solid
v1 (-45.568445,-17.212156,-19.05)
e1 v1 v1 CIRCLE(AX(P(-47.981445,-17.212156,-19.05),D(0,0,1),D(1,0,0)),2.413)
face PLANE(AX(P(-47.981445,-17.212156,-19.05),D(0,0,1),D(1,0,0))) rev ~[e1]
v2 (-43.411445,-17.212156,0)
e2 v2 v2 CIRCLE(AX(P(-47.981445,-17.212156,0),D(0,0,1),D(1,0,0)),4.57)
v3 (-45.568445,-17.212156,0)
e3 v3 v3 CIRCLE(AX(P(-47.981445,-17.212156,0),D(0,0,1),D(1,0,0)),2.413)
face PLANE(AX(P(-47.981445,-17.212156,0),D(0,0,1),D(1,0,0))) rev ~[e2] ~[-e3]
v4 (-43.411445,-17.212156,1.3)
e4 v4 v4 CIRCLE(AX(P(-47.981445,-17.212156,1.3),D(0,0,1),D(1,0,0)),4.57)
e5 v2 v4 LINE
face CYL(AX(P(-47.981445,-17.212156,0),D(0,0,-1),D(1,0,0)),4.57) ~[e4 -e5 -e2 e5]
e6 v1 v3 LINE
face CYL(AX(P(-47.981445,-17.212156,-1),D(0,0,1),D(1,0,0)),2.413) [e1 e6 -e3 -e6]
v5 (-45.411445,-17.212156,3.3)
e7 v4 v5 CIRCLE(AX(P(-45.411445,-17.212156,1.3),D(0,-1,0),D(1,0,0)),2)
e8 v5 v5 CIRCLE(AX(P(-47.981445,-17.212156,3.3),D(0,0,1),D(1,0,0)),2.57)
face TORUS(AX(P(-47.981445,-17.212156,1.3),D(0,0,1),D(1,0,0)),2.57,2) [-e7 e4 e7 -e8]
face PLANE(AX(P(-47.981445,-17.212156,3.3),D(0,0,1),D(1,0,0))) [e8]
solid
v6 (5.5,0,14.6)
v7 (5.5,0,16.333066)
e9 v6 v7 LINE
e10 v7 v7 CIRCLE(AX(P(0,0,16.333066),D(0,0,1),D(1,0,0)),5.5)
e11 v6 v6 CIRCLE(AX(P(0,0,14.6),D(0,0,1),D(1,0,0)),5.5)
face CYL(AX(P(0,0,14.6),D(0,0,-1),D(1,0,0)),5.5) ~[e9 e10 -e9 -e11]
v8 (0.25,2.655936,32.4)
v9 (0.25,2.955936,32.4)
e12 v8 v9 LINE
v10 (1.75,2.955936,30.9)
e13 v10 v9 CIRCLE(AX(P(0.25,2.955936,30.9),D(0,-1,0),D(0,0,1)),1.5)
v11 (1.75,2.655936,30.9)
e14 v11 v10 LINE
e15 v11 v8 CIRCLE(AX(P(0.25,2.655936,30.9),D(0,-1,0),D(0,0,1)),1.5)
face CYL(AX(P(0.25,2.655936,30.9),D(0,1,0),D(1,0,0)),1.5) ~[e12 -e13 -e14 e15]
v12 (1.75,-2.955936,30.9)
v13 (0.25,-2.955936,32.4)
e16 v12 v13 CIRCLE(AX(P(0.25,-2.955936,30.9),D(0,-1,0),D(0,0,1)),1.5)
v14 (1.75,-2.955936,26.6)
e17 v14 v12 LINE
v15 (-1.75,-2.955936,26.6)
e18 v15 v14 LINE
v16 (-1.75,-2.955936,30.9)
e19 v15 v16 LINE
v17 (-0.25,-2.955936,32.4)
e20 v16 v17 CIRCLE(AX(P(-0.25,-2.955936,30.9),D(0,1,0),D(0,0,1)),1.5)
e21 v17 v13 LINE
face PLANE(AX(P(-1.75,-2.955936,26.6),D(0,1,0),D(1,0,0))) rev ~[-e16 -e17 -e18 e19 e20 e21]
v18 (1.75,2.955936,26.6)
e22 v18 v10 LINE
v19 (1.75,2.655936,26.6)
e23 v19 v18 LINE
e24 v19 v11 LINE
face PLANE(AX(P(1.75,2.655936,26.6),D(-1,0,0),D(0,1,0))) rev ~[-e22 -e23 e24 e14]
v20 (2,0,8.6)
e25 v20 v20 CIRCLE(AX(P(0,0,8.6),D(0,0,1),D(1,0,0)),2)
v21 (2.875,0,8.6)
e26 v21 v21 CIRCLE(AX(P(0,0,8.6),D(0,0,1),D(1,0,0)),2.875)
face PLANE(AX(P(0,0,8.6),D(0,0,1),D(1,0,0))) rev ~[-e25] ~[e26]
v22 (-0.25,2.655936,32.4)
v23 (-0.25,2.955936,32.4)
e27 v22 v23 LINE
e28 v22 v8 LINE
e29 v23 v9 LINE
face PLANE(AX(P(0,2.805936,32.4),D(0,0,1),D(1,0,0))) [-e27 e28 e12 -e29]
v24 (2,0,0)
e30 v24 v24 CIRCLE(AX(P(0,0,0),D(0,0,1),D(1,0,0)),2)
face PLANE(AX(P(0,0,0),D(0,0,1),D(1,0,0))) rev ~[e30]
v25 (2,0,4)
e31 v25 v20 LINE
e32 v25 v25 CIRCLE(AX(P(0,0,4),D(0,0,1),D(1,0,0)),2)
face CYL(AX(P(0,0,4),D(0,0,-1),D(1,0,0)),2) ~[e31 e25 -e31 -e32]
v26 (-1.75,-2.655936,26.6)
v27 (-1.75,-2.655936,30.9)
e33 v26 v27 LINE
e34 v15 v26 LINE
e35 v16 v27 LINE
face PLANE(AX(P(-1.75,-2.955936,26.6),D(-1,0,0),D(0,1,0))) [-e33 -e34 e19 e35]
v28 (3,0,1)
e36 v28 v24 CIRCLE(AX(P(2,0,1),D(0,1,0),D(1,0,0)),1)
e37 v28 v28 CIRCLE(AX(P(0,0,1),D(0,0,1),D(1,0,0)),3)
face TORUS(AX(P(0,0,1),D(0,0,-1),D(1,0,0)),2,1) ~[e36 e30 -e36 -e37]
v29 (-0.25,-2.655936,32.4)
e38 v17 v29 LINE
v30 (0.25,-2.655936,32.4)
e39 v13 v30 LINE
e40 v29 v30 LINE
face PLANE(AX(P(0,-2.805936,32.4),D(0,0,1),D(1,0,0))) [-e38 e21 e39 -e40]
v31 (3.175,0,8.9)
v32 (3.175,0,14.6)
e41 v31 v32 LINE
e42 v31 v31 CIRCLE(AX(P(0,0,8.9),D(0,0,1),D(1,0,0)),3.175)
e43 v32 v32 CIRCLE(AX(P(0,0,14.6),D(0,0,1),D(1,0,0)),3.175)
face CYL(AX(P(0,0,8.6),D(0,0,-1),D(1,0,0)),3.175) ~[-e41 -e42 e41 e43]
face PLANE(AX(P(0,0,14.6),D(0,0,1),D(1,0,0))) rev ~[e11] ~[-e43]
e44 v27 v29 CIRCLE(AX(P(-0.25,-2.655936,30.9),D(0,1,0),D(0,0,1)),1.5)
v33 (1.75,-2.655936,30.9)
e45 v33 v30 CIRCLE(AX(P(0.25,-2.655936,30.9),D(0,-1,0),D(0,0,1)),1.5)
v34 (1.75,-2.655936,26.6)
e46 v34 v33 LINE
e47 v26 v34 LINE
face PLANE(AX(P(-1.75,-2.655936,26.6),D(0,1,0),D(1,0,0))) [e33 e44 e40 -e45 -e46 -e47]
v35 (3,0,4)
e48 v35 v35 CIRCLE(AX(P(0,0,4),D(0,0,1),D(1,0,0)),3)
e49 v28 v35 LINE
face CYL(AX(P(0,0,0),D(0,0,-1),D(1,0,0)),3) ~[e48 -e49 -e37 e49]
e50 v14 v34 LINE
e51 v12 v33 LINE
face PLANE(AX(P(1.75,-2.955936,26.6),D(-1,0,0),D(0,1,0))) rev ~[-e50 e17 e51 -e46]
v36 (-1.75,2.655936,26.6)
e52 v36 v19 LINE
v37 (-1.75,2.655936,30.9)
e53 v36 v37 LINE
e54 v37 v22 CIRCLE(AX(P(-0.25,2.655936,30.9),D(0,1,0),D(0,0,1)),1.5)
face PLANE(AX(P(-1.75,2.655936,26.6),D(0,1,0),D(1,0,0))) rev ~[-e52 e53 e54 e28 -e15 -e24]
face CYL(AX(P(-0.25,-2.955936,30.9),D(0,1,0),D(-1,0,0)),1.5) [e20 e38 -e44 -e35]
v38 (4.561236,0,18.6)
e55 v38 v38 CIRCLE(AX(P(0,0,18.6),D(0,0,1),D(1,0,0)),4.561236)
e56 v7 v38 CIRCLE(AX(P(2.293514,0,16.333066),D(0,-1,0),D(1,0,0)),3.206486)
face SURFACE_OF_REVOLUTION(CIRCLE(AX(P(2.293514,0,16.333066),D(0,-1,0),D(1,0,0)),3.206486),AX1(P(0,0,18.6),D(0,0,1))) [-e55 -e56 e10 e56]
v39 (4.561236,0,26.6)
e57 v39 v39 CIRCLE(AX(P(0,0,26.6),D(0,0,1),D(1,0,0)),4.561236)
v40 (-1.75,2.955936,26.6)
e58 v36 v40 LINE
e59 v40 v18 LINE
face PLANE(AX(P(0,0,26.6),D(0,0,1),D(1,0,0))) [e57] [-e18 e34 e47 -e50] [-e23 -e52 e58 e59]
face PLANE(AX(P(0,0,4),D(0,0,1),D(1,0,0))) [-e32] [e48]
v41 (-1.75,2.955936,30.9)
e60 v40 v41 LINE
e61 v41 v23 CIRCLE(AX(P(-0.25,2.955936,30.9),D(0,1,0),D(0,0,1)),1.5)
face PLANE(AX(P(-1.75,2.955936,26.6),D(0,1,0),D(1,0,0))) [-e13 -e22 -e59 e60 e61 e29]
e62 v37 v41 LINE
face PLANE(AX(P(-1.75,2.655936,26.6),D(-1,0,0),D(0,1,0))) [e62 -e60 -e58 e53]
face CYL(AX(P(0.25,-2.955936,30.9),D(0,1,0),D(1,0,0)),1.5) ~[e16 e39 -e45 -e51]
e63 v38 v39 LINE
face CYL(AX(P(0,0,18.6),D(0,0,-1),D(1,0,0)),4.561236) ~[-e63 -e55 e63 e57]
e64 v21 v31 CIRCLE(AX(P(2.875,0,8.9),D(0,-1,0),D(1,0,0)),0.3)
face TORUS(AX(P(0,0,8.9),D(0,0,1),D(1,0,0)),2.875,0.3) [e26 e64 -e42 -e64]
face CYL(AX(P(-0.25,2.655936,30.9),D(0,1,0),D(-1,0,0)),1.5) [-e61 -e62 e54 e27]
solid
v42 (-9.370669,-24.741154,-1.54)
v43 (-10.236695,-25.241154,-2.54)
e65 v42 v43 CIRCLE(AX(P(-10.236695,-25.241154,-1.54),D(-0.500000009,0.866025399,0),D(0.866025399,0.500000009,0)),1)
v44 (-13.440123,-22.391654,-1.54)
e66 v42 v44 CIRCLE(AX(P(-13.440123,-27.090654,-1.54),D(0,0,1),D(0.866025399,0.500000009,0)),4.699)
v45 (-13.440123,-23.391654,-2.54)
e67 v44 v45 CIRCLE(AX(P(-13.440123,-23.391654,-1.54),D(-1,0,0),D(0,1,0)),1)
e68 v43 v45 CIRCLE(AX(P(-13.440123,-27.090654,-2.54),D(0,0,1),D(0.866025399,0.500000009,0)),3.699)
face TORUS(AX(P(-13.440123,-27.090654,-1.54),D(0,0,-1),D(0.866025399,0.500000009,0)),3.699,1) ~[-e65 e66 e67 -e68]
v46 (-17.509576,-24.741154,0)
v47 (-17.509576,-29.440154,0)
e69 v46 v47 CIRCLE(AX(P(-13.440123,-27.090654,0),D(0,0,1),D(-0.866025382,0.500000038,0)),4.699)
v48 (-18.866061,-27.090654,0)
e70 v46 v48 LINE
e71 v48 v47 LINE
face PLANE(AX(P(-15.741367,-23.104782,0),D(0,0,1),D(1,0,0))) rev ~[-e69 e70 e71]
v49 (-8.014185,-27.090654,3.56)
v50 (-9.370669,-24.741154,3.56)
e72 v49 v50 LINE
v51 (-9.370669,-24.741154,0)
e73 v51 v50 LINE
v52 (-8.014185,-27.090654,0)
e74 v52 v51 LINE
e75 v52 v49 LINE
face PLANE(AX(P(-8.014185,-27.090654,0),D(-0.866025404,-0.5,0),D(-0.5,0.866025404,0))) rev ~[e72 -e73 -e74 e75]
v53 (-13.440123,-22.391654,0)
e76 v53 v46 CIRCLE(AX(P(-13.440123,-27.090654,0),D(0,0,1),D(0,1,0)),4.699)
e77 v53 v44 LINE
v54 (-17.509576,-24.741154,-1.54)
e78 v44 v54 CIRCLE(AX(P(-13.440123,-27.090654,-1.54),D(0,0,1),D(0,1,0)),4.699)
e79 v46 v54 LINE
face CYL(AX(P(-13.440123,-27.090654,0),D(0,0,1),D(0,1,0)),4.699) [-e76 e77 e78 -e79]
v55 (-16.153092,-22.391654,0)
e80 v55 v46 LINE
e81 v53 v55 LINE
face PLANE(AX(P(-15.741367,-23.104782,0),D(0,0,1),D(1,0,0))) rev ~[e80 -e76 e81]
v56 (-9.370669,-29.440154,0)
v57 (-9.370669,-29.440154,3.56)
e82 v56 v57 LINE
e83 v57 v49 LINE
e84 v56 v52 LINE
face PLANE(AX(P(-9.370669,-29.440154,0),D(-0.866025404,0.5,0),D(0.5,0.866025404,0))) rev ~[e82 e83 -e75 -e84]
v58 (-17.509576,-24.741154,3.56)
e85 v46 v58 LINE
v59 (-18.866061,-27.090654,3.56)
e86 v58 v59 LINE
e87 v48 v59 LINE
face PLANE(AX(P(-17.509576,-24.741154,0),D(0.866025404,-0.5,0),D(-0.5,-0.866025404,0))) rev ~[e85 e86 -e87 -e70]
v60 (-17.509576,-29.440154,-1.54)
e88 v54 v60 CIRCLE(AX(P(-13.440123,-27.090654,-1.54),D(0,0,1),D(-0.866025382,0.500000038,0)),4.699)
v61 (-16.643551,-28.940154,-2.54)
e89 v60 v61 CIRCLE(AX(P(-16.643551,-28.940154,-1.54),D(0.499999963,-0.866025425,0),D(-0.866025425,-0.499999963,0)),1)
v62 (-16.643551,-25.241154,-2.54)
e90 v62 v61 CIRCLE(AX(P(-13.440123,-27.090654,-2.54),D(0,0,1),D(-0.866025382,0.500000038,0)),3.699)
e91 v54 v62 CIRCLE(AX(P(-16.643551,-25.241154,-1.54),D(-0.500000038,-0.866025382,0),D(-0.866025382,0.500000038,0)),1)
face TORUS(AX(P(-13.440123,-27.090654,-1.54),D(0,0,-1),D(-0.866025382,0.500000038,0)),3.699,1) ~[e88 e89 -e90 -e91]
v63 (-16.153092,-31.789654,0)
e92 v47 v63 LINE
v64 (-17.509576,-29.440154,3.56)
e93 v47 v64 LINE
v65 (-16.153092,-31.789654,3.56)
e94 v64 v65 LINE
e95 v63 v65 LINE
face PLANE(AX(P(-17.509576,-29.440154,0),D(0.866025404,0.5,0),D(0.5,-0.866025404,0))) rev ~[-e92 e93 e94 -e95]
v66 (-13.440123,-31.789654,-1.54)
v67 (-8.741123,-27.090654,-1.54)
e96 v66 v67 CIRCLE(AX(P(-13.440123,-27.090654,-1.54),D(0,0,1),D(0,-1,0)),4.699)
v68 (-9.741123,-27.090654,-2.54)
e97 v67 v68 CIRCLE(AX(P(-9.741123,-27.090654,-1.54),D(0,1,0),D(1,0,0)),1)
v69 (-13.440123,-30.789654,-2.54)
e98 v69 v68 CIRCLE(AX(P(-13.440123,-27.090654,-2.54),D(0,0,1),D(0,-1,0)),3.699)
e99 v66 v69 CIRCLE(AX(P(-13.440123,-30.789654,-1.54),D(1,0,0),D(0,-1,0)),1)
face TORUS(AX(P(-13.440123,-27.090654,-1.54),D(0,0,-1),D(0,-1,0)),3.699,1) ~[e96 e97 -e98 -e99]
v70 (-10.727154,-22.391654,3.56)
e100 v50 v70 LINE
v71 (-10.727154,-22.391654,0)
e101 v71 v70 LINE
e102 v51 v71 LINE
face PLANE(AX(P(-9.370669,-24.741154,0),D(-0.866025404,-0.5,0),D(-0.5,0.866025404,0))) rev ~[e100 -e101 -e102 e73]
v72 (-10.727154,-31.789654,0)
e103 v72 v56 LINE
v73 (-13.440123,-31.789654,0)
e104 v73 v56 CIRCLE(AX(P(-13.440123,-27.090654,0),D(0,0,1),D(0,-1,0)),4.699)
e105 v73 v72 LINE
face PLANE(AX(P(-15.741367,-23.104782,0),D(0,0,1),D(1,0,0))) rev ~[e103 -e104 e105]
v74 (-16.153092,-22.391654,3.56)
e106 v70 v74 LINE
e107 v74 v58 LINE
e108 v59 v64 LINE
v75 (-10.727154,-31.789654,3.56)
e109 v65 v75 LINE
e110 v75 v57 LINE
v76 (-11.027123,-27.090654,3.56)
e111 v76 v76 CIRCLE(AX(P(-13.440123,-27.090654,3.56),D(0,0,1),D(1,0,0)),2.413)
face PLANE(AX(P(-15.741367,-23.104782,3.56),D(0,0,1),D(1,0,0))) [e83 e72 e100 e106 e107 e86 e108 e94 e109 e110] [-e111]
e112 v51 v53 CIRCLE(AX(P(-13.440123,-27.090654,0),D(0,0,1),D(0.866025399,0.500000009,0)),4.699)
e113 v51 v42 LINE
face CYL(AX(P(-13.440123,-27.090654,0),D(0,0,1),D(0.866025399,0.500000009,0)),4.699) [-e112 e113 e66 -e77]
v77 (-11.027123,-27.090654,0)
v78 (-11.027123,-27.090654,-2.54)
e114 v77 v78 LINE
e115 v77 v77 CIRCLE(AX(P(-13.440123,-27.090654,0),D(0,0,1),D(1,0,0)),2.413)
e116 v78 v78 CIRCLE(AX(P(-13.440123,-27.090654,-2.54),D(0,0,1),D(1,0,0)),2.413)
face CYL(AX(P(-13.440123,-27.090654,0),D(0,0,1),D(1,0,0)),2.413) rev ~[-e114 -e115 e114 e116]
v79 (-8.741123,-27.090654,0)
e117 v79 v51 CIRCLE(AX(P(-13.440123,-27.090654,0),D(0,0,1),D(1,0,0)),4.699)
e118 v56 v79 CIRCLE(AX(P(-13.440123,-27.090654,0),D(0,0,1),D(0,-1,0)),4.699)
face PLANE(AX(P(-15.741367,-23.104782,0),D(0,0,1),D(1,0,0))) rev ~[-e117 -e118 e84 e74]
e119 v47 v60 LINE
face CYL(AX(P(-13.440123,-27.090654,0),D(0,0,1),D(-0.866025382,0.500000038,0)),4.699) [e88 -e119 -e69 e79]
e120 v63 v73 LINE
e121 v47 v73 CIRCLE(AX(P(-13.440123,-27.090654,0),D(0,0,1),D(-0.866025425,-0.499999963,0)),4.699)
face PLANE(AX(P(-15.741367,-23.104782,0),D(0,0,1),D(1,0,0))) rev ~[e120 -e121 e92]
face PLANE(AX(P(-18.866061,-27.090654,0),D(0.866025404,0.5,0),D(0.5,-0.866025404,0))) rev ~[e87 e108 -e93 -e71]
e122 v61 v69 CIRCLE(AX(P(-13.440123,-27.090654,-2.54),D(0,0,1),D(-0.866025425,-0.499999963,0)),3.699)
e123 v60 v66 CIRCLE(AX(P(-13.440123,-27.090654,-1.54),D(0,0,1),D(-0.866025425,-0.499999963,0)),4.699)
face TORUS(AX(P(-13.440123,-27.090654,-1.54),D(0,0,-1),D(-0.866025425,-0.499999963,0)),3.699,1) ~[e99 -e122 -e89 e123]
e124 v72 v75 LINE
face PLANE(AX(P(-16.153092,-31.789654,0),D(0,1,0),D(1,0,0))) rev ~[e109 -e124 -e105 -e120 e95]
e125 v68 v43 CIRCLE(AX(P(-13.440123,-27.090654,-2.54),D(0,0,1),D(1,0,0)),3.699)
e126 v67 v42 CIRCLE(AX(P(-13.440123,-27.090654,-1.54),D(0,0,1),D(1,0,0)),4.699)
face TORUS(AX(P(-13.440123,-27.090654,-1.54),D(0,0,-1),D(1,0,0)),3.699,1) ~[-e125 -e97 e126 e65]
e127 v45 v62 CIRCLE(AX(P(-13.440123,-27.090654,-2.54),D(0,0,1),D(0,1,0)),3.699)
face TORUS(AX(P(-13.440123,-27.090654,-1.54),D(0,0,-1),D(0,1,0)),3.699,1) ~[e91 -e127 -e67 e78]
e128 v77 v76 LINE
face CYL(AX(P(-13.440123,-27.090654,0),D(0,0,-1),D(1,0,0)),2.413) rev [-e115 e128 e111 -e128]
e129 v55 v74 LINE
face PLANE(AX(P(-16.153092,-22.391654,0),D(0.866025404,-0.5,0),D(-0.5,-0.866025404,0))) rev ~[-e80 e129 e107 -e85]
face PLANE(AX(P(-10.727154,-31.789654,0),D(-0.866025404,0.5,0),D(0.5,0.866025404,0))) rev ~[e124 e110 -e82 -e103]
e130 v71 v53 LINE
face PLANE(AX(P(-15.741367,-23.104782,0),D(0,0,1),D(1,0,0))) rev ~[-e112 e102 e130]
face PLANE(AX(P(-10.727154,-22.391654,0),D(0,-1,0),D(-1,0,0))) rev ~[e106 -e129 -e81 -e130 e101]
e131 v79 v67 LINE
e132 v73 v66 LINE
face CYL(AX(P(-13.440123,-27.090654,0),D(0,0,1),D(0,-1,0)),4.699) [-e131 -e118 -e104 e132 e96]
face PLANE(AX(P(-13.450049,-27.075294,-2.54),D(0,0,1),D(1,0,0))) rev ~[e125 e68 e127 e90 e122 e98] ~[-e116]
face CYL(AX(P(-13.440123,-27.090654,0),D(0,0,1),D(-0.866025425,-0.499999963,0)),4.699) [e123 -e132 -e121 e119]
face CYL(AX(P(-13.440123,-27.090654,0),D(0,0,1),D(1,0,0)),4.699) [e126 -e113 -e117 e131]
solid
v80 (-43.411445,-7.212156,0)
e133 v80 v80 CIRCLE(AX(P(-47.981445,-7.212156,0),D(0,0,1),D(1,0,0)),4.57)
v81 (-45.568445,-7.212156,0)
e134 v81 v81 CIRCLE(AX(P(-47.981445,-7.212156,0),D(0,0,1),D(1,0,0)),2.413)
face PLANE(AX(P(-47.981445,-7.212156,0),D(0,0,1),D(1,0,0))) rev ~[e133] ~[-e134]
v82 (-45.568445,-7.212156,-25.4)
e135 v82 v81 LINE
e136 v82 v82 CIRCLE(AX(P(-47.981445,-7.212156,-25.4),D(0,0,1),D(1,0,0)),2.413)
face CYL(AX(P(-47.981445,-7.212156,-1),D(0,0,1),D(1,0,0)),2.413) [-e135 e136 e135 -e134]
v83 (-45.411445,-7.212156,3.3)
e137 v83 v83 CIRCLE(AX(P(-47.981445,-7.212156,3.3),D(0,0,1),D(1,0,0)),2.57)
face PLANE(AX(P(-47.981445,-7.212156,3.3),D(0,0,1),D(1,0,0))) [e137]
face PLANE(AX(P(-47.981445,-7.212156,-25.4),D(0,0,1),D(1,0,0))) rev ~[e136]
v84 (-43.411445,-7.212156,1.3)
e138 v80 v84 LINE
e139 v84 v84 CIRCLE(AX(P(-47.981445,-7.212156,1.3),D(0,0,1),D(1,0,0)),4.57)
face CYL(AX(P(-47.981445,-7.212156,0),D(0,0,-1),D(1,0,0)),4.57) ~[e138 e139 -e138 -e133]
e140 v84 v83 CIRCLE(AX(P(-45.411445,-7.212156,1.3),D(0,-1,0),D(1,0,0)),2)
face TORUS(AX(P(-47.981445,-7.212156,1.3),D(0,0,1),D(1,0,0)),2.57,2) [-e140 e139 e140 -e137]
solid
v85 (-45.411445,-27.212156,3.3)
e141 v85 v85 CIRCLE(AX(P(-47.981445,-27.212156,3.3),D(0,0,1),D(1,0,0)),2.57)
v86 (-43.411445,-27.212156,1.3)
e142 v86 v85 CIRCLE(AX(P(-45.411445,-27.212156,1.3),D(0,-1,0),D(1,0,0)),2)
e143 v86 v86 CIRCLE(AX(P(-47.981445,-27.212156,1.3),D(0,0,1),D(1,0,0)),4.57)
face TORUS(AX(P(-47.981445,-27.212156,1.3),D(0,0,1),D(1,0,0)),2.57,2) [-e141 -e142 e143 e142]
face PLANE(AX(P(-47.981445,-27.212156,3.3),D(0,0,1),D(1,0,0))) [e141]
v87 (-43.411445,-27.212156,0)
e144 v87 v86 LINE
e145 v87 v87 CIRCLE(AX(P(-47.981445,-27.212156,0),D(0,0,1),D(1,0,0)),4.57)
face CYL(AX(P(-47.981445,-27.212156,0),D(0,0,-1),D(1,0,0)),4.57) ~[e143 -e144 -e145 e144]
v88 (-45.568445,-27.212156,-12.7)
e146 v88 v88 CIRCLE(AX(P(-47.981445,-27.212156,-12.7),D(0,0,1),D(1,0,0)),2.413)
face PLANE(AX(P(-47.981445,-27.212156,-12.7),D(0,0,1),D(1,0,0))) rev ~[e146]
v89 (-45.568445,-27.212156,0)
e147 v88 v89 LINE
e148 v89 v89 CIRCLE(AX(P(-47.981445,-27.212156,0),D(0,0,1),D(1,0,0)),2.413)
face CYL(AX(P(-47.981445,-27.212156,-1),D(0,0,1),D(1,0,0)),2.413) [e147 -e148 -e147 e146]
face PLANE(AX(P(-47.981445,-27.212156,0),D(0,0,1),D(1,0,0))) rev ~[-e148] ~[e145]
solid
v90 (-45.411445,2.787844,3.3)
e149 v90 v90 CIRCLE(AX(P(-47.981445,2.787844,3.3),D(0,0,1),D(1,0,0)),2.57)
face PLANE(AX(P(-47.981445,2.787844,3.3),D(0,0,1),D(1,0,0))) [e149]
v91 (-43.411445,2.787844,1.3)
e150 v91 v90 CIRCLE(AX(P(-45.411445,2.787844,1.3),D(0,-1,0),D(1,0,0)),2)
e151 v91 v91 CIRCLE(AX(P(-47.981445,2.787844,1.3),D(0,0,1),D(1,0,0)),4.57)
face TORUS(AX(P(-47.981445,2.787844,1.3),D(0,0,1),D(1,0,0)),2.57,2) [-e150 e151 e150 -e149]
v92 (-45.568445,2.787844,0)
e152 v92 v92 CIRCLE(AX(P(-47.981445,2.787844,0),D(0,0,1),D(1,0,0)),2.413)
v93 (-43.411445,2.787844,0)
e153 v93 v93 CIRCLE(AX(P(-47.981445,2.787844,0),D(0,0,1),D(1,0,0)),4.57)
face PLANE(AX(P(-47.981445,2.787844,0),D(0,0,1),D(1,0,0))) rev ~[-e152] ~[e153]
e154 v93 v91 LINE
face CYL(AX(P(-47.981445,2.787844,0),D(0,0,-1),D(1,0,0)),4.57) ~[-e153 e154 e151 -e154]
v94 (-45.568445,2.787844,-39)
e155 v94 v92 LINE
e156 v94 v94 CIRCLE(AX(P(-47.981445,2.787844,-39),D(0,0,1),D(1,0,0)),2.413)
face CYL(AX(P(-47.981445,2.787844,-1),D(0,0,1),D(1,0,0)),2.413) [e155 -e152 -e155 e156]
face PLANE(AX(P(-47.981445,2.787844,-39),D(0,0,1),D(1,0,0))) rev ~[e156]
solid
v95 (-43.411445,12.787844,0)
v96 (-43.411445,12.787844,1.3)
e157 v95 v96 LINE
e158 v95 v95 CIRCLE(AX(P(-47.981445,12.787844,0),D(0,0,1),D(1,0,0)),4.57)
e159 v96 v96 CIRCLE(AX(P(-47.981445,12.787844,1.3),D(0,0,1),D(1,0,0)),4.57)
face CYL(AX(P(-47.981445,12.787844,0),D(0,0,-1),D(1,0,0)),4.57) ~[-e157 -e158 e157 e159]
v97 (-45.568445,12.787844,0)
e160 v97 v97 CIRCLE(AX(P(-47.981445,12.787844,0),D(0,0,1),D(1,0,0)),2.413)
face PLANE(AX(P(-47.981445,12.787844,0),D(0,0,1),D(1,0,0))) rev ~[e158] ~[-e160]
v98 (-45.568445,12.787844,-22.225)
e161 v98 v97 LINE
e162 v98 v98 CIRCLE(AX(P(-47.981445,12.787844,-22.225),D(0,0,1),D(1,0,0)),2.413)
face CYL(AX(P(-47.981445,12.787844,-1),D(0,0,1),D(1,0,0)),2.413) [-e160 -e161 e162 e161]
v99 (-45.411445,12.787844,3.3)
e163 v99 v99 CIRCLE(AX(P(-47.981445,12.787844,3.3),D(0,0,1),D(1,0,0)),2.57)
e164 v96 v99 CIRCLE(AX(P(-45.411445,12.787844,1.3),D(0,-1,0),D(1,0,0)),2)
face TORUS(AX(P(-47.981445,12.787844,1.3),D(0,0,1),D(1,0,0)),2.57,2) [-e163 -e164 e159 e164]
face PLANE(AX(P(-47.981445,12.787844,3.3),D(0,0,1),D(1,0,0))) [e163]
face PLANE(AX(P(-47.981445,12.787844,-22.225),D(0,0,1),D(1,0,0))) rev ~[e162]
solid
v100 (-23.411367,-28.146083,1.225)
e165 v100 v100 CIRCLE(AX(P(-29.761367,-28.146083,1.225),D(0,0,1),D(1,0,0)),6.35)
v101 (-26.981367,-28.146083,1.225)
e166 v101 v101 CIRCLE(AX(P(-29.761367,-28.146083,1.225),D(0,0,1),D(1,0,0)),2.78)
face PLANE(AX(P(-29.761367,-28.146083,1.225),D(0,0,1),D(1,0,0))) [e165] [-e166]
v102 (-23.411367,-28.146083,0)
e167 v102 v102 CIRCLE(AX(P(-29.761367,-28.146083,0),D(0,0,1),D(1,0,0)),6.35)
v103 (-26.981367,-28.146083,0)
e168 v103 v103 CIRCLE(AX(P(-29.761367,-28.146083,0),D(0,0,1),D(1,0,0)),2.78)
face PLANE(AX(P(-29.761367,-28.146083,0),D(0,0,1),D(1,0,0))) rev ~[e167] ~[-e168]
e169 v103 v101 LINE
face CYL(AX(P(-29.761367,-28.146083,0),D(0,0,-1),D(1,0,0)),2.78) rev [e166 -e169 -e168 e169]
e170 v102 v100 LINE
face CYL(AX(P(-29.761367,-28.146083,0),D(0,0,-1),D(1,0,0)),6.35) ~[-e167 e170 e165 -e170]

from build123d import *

# Parameters (mm, degrees)
F0_R      = 3
F1_DEPTH  = 4
F2_R      = 2
F3_DEPTH  = 4.6
F4_R      = 3.175
F5_DEPTH  = 6
F6_R      = 5.5
F7_DEPTH  = 4
F8_R      = 4.5612364212
F9_DEPTH  = 8
F11_R     = 1
F12_R     = 0.3
F13_W     = 3.5
F13_H     = 0.3
F14_DEPTH = 5.8
F15_R     = 1.5
F16_R     = 4.57
F16_R_2   = 2.413
F17_DEPTH = 3.3
F18_R     = 2
F19_DEPTH = 1
F21_DEPTH = 11.7
F23_DEPTH = 18.05
F25_DEPTH = 24.4
F27_DEPTH = 38
F28_R     = 6.35
F28_R_2   = 2.78
F29_DEPTH = 1.225
F30_R     = 2.413
F31_DEPTH = 3.56
F32_DEPTH = 2.54
F33_R     = 1
F34_DEPTH = 21.225


# Not quite as in the source:
# - a fillet or chamfer that OpenCascade refuses, or shapes differently, is made with other operations: its cross-section is extruded or revolved along the edge and cut away or added


with BuildPart() as f1:
    # F0 (on Top) → F1 (new body)
    with BuildSketch(Plane.XY):
        Circle(F0_R)
    extrude(amount=F1_DEPTH)

    # F2 (on face) → F3 (join)
    with BuildSketch(Plane.XY.offset(4)):
        Circle(F2_R)
    extrude(amount=F3_DEPTH)

    # F4 (on face) → F5 (join)
    with BuildSketch(Plane.XY.offset(8.6)):
        Circle(F4_R)
    extrude(amount=F5_DEPTH)

    # F6 (on face) → F7 (join)
    with BuildSketch(Plane.XY.offset(14.6)):
        Circle(F6_R)
    extrude(amount=F7_DEPTH)

    # F8 (on face) → F9 (join)
    with BuildSketch(Plane.XY.offset(18.6)):
        Circle(F8_R)
    extrude(amount=F9_DEPTH)

    # F10: fillet of radius 3.2064860271 on 1 edges, made by hand

    # F10_s1 → F10_t2 (revolve, cut)
    with BuildSketch(Plane.XZ):
        with BuildLine():
            ThreePointArc((5.5, 16.3330664898), (5.256027516, 17.5598778645), (4.5612364212, 18.6))
            Line((4.5612364212, 18.6), (5.5, 18.6))
            Line((5.5, 18.6), (5.5, 16.3330664898))
        make_face()
    revolve(axis=Axis((0, 0, 18.6), (0, 0, 1)), mode=Mode.SUBTRACT)

    # F11
    f11_edges = [f1.edges().sort_by_distance(p)[0] for p in [
        (-3, 0, 0),
    ]]
    fillet(f11_edges, radius=F11_R)

    # F12
    f12_edges = [f1.edges().sort_by_distance(p)[0] for p in [
        (-3.175, 0, 8.6),
    ]]
    fillet(f12_edges, radius=F12_R)

    # F13 (on face) → F14 (join)
    with BuildSketch(Plane.XY.offset(26.6)):
        with Locations((0, 2.8059364047)):
            Rectangle(F13_W, F13_H)
        with Locations((0, -2.8059364047)):
            Rectangle(F13_W, F13_H)
    extrude(amount=F14_DEPTH)

    # F15
    f15_edges = [f1.edges().sort_by_distance(p)[0] for p in [
        (1.75, 2.805936, 32.4),
        (1.75, -2.805936, 32.4),
        (-1.75, -2.805936, 32.4),
        (-1.75, 2.805936, 32.4),
    ]]
    fillet(f15_edges, radius=F15_R)


with BuildPart() as f17:
    # F16 (on Top) → F17 (new body)
    with BuildSketch(Plane.XY):
        with Locations((-47.9814447463, -27.2121559829)):
            Circle(F16_R)
        with Locations((-47.9814447463, -27.2121559829)):
            Circle(F16_R_2, mode=Mode.SUBTRACT)
        with Locations((-47.9814447463, -27.2121559829)):
            Circle(F16_R_2)
    extrude(amount=F17_DEPTH)

    # F18
    f18_edges = [f17.edges().sort_by_distance(p)[0] for p in [
        (-52.551445, -27.212156, 3.3),
    ]]
    fillet(f18_edges, radius=F18_R)

    # F16 (on Top) → F19 (join)
    with BuildSketch(Plane.XY):
        with Locations((-47.9814447463, -27.2121559829)):
            Circle(F16_R_2)
    extrude(amount=-F19_DEPTH)


with BuildPart() as f20_1:
    # F20: copy of F17
    add(f17.part.moved(Location((0, 10, 0))))


with BuildPart() as f17_1:
    add(f17.part)

    # F21 (add): a face of the model
    f21_faces = [f17_1.faces().sort_by_distance(p)[0] for p in [
        (-47.9814447463, -27.2121559829, -1),
    ]]
    extrude(f21_faces, amount=F21_DEPTH)


with BuildPart() as f22_1:
    # F22: copy of F20_1
    add(f20_1.part.moved(Location((0, 10, 0))))


with BuildPart() as f20_1_1:
    add(f20_1.part)

    # F23 (add): a face of the model
    f23_faces = [f20_1_1.faces().sort_by_distance(p)[0] for p in [
        (-47.9814447463, -17.2121559829, -1),
    ]]
    extrude(f23_faces, amount=F23_DEPTH)


with BuildPart() as f24_1:
    # F24: copy of F22_1
    add(f22_1.part.moved(Location((0, 10, 0))))


with BuildPart() as f22_1_1:
    add(f22_1.part)

    # F25 (add): a face of the model
    f25_faces = [f22_1_1.faces().sort_by_distance(p)[0] for p in [
        (-47.9814447463, -7.2121559829, -1),
    ]]
    extrude(f25_faces, amount=F25_DEPTH)


with BuildPart() as f26_1:
    # F26: copy of F24_1
    add(f24_1.part.moved(Location((0, 10, 0))))

    # F34 (add): a face of the model
    f34_faces = [f26_1.faces().sort_by_distance(p)[0] for p in [
        (-47.9814447463, 12.7878440171, -1),
    ]]
    extrude(f34_faces, amount=F34_DEPTH)


with BuildPart() as f24_1_1:
    add(f24_1.part)

    # F27 (add): a face of the model
    f27_faces = [f24_1_1.faces().sort_by_distance(p)[0] for p in [
        (-47.9814447463, 2.7878440171, -1),
    ]]
    extrude(f27_faces, amount=F27_DEPTH)


with BuildPart() as f29:
    # F28 (on Top) → F29 (new body)
    with BuildSketch(Plane.XY):
        with Locations((-29.7613665462, -28.1460825354)):
            Circle(F28_R)
        with Locations((-29.7613665462, -28.1460825354)):
            Circle(F28_R_2, mode=Mode.SUBTRACT)
    extrude(amount=F29_DEPTH)


with BuildPart() as f31:
    # F30 (on Top) → F31 (new body)
    with BuildSketch(Plane.XY):
        with BuildLine():
            Line((-13.4401228279, -22.3916537771), (-16.1530917428, -22.3916537771))
            Line((-16.1530917428, -22.3916537771), (-17.5095760985, -24.7411536008))
            ThreePointArc((-17.5095760985, -24.7411536008), (-15.7896227397, -23.0212003538), (-13.4401228279, -22.3916537771))
        make_face()
        with BuildLine():
            Line((-10.727153913, -22.3916537771), (-13.4401228279, -22.3916537771))
            ThreePointArc((-13.4401228279, -22.3916537771), (-11.0906228488, -23.0212003927), (-9.3706694796, -24.7411537354))
            Line((-9.3706694796, -24.7411537354), (-10.727153913, -22.3916537771))
        make_face()
        with BuildLine():
            ThreePointArc((-9.3706694796, -24.7411537354), (-11.0906228488, -23.0212003927), (-13.4401228279, -22.3916537771))
            ThreePointArc((-13.4401228279, -22.3916537771), (-15.7896227397, -23.0212003538), (-17.5095760985, -24.7411536008))
            ThreePointArc((-17.5095760985, -24.7411536008), (-18.1391228279, -27.0906535737), (-17.5095763019, -29.4401536012))
            ThreePointArc((-17.5095763019, -29.4401536012), (-15.7896229159, -31.1601070987), (-13.4401228279, -31.7896537771))
            ThreePointArc((-13.4401228279, -31.7896537771), (-11.0906228488, -31.1601071616), (-9.3706694796, -29.4401538189))
            ThreePointArc((-9.3706694796, -29.4401538189), (-8.9012373764, -28.3068444934), (-8.7411228279, -27.0906537771))
            ThreePointArc((-8.7411228279, -27.0906537771), (-8.9012373764, -25.8744630609), (-9.3706694796, -24.7411537354))
        make_face()
        with Locations((-13.4401228279, -27.0906537771)):
            Circle(F30_R, mode=Mode.SUBTRACT)
        with BuildLine():
            ThreePointArc((-17.5095763019, -29.4401536012), (-18.1391228279, -27.0906535737), (-17.5095760985, -24.7411536008))
            Line((-17.5095760985, -24.7411536008), (-18.8660606577, -27.0906537771))
            Line((-18.8660606577, -27.0906537771), (-17.5095763019, -29.4401536012))
        make_face()
        with BuildLine():
            Line((-8.014184998, -27.0906537771), (-9.3706694796, -24.7411537354))
            ThreePointArc((-9.3706694796, -24.7411537354), (-8.9012373764, -25.8744630609), (-8.7411228279, -27.0906537771))
            ThreePointArc((-8.7411228279, -27.0906537771), (-8.9012373764, -28.3068444934), (-9.3706694796, -29.4401538189))
            Line((-9.3706694796, -29.4401538189), (-8.014184998, -27.0906537771))
        make_face()
        with BuildLine():
            ThreePointArc((-13.4401228279, -31.7896537771), (-15.7896229159, -31.1601070987), (-17.5095763019, -29.4401536012))
            Line((-17.5095763019, -29.4401536012), (-16.1530917428, -31.7896537771))
            Line((-16.1530917428, -31.7896537771), (-13.4401228279, -31.7896537771))
        make_face()
        with BuildLine():
            ThreePointArc((-9.3706694796, -29.4401538189), (-11.0906228488, -31.1601071616), (-13.4401228279, -31.7896537771))
            Line((-13.4401228279, -31.7896537771), (-10.727153913, -31.7896537771))
            Line((-10.727153913, -31.7896537771), (-9.3706694796, -29.4401538189))
        make_face()
    extrude(amount=F31_DEPTH)

    # F30 (on Top) → F32 (join)
    with BuildSketch(Plane.XY):
        with BuildLine():
            ThreePointArc((-9.3706694796, -24.7411537354), (-11.0906228488, -23.0212003927), (-13.4401228279, -22.3916537771))
            ThreePointArc((-13.4401228279, -22.3916537771), (-15.7896227397, -23.0212003538), (-17.5095760985, -24.7411536008))
            ThreePointArc((-17.5095760985, -24.7411536008), (-18.1391228279, -27.0906535737), (-17.5095763019, -29.4401536012))
            ThreePointArc((-17.5095763019, -29.4401536012), (-15.7896229159, -31.1601070987), (-13.4401228279, -31.7896537771))
            ThreePointArc((-13.4401228279, -31.7896537771), (-11.0906228488, -31.1601071616), (-9.3706694796, -29.4401538189))
            ThreePointArc((-9.3706694796, -29.4401538189), (-8.9012373764, -28.3068444934), (-8.7411228279, -27.0906537771))
            ThreePointArc((-8.7411228279, -27.0906537771), (-8.9012373764, -25.8744630609), (-9.3706694796, -24.7411537354))
        make_face()
        with Locations((-13.4401228279, -27.0906537771)):
            Circle(F30_R, mode=Mode.SUBTRACT)
    extrude(amount=-F32_DEPTH)

    # F33
    f33_edges = [f31.edges().sort_by_distance(p)[0] for p in [
        (-9.370669, -24.741154, -2.54),
    ]]
    fillet(f33_edges, radius=F33_R)


solid = Compound([f1.part, f17_1.part, f20_1_1.part, f22_1_1.part, f26_1.part, f24_1_1.part, f29.part, f31.part])
